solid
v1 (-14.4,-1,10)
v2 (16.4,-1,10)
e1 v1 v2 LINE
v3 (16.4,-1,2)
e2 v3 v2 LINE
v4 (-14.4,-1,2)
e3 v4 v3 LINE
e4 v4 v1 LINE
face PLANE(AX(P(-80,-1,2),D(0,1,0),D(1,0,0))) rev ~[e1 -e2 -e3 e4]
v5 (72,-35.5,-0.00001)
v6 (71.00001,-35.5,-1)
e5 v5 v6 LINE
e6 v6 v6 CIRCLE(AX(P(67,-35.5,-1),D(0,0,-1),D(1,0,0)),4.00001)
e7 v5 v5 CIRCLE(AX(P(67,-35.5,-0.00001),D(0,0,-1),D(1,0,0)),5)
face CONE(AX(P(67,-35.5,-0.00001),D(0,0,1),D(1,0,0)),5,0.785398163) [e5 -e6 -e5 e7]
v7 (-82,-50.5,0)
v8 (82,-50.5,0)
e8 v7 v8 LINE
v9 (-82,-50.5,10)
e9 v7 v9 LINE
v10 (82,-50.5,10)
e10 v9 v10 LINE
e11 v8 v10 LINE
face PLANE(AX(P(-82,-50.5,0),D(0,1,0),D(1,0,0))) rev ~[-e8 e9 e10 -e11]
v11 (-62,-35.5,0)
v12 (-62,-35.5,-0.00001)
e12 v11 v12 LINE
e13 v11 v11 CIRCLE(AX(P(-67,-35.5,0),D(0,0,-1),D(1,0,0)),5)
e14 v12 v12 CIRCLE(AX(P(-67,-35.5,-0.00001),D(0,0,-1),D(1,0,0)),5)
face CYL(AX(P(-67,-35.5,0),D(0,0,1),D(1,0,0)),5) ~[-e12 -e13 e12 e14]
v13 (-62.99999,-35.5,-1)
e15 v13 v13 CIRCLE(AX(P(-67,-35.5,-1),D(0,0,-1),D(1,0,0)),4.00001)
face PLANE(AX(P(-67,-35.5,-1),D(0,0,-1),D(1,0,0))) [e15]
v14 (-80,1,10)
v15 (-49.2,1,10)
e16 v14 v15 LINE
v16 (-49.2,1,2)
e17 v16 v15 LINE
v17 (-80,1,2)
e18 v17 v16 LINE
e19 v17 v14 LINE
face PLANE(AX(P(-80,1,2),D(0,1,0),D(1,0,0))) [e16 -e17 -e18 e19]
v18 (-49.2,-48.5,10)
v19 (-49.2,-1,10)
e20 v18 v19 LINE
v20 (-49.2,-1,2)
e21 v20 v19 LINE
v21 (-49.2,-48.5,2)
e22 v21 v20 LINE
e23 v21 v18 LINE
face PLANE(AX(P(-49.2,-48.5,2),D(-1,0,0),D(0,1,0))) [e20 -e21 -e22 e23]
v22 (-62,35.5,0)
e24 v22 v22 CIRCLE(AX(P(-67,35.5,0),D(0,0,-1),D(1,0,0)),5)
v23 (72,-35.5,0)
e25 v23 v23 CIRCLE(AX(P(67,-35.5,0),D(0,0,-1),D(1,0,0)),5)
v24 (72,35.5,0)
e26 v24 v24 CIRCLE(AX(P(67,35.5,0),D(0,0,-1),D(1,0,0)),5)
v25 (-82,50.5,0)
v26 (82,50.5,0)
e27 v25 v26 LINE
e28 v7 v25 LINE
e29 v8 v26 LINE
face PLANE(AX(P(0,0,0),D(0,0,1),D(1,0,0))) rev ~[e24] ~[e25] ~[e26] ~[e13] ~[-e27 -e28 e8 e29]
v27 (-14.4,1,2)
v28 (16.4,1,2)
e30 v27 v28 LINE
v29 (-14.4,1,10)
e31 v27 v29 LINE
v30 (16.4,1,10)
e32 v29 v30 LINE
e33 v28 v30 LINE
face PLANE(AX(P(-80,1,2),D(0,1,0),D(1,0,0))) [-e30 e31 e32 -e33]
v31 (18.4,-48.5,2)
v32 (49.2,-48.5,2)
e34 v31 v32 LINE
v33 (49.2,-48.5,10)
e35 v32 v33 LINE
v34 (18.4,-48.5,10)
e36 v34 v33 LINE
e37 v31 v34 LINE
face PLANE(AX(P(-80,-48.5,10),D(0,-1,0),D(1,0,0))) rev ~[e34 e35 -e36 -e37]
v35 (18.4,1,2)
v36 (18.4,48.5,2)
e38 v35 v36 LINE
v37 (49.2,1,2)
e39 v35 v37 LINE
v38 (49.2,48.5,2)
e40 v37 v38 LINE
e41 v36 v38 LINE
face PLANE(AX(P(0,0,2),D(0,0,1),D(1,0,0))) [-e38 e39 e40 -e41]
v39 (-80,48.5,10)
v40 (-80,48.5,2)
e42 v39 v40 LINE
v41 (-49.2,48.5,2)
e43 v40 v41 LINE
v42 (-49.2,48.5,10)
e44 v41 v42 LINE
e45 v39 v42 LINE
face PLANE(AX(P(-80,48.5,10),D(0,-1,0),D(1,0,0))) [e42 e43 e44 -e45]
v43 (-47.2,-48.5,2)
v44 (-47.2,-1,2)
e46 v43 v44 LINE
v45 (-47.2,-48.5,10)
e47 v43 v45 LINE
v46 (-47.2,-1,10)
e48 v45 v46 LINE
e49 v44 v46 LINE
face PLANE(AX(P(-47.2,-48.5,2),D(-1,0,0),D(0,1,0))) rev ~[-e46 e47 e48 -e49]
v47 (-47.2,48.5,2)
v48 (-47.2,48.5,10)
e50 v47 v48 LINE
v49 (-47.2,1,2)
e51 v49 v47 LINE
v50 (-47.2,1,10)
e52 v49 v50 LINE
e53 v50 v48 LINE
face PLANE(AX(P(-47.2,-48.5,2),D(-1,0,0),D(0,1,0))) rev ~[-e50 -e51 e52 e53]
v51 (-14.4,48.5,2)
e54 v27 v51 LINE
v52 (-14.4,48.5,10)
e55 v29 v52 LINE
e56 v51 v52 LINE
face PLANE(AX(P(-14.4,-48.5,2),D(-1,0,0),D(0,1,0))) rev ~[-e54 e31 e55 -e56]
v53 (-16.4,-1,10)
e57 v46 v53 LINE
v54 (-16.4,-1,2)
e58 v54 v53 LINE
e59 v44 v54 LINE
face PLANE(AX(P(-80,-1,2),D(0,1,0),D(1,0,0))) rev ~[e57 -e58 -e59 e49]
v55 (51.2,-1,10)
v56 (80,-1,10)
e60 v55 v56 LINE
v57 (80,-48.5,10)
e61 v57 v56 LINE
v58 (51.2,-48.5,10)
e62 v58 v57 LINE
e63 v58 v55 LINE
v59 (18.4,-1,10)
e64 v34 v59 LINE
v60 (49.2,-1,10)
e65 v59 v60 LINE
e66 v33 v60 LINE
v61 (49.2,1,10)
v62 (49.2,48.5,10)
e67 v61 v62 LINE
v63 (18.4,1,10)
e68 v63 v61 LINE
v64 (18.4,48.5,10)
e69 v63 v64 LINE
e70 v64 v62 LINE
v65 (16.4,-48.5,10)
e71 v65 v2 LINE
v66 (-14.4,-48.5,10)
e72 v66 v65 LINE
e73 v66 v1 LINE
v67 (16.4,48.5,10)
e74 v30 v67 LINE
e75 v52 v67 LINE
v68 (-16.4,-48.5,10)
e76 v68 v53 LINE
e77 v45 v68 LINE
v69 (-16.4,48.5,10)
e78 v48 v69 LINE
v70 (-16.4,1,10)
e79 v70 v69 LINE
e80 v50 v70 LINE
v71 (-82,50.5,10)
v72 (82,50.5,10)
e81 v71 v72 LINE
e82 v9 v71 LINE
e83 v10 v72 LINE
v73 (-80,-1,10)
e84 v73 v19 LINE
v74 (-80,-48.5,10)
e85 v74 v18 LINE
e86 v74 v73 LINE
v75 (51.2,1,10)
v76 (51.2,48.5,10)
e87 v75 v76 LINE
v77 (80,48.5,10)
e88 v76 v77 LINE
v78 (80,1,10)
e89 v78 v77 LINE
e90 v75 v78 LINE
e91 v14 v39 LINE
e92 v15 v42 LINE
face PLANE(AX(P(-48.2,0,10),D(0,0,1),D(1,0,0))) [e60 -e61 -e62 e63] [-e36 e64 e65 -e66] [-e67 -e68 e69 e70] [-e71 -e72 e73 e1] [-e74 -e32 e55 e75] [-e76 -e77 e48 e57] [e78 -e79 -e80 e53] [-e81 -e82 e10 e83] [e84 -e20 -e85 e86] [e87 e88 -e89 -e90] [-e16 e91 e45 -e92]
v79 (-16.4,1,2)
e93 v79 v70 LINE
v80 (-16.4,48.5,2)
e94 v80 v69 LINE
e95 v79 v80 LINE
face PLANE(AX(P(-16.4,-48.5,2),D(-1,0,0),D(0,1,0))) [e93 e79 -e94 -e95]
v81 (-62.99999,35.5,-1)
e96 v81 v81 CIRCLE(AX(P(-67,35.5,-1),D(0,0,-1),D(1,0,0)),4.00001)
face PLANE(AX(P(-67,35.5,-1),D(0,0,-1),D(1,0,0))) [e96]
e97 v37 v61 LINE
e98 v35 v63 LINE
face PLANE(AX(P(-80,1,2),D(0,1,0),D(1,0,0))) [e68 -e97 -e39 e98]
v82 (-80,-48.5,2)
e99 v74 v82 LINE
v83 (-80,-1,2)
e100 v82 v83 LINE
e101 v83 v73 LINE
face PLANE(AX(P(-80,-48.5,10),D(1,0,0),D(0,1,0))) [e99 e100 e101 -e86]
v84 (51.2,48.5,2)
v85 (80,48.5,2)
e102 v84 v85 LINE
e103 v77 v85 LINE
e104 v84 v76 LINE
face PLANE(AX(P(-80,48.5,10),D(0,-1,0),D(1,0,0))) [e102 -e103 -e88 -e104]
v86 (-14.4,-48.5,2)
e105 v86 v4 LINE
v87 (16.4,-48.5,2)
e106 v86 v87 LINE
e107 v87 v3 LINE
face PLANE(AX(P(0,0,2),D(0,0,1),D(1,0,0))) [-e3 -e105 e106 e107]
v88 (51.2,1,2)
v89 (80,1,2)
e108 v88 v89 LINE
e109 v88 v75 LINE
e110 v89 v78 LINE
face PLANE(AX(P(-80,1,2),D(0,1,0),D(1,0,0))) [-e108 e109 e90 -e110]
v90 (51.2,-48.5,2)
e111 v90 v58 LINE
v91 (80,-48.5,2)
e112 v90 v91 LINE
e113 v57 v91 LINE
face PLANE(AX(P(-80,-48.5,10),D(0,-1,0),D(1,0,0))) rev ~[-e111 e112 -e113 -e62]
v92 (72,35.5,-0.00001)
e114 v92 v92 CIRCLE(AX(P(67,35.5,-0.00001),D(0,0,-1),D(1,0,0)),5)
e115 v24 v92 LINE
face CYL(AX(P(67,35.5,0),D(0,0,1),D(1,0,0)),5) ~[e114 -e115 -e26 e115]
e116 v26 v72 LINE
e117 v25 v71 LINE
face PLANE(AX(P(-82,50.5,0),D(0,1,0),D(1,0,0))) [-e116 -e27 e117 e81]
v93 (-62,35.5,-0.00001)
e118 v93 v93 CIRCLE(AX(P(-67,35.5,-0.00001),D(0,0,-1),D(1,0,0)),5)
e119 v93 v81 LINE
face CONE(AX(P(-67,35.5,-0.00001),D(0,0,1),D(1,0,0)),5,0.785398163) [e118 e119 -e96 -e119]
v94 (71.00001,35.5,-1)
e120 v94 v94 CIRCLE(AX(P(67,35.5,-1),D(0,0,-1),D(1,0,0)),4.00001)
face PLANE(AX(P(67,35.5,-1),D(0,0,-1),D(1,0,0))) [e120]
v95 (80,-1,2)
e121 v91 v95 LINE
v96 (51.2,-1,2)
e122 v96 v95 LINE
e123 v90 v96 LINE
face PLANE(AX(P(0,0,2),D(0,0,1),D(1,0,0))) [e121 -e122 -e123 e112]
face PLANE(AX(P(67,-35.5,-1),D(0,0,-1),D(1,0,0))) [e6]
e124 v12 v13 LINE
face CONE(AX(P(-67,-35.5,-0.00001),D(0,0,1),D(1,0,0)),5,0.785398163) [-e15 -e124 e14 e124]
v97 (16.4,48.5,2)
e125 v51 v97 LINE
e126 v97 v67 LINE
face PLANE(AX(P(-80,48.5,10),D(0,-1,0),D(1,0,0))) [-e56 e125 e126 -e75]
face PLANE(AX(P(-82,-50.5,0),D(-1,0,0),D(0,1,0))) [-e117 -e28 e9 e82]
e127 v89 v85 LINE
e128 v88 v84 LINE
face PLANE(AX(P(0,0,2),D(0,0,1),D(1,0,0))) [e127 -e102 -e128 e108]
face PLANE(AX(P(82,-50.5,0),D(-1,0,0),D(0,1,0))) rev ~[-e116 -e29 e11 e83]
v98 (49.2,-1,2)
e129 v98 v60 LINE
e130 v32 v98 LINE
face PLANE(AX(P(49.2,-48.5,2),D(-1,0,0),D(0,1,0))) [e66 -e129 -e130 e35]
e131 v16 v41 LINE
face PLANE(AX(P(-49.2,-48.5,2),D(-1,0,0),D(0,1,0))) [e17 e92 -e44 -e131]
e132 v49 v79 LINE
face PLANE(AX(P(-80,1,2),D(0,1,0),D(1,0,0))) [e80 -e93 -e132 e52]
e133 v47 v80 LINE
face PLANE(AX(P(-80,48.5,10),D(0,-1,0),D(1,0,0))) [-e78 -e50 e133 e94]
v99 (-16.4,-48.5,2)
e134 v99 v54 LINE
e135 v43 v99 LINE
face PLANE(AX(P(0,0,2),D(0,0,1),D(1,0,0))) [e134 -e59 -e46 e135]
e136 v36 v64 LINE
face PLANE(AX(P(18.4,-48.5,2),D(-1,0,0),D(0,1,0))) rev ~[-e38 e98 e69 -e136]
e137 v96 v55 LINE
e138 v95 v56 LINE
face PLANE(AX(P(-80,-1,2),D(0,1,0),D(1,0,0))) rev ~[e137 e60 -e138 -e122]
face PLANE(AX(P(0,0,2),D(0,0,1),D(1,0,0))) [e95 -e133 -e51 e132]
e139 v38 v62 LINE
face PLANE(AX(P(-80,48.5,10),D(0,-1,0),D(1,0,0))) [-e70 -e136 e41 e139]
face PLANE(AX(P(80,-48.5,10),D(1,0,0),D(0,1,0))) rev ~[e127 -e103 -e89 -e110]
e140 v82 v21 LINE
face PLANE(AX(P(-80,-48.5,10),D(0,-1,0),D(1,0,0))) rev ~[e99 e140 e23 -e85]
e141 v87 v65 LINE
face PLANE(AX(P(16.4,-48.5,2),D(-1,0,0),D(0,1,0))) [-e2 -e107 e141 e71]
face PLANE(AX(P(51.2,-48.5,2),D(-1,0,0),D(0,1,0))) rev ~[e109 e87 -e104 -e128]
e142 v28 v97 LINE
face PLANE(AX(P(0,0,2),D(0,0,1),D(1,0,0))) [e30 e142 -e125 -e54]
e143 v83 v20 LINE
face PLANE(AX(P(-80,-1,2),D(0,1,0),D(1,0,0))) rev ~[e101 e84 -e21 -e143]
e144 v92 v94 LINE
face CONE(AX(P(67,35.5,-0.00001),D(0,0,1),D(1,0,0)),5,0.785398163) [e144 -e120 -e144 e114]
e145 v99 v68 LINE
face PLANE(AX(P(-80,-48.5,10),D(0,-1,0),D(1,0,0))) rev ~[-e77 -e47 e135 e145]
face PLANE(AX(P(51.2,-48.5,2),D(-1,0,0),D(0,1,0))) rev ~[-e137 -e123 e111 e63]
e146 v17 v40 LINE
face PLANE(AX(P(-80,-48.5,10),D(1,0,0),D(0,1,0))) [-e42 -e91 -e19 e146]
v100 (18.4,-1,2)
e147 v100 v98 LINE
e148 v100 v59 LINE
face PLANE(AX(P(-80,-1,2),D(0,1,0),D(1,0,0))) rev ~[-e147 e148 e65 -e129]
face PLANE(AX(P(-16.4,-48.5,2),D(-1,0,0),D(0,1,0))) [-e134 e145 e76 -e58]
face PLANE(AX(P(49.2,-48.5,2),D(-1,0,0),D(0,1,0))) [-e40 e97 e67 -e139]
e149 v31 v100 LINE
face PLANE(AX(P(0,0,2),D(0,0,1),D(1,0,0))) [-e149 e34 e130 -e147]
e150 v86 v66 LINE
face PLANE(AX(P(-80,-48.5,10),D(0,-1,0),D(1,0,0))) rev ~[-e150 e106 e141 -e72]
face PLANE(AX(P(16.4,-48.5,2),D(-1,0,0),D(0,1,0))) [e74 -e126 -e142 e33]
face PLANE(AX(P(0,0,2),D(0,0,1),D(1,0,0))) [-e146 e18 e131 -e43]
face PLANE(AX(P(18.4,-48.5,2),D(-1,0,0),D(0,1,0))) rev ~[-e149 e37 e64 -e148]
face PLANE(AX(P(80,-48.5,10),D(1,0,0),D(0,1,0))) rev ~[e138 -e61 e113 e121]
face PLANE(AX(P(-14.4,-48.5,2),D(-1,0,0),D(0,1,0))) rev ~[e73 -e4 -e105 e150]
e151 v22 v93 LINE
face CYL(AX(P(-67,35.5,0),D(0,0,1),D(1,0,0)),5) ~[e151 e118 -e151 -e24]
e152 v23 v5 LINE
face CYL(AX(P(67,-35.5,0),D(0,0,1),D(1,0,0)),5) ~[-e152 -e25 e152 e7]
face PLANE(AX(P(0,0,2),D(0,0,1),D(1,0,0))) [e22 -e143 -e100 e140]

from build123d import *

# Parameters (mm, degrees)
F0_W     = 164
F0_H     = 101
F1_DEPTH = 10
F2_W     = 160
F2_H     = 97
F3_DEPTH = 8
F4_W     = 160
F4_H     = 2
F5_DEPTH = 8
F6_W     = 2
F6_H     = 97
F7_DEPTH = 8
F8_R     = 5
F9_DEPTH = 1
F10_SIZE = 0.99999


# Not quite as in the source:
# - a fillet or chamfer is up to 0.001 mm smaller than in the source, because OpenCascade refuses the exact size


with BuildPart() as f1:
    # F0 (on Top) → F1 (new body)
    with BuildSketch(Plane.XY):
        Rectangle(F0_W, F0_H)
    extrude(amount=F1_DEPTH)

    # F2 (on face) → F3 (cut)
    with BuildSketch(Plane.XY.offset(10)):
        Rectangle(F2_W, F2_H)
    extrude(amount=-F3_DEPTH, mode=Mode.SUBTRACT)

    # F4 (on face) → F5 (join)
    with BuildSketch(Plane.XY.offset(2)):
        Rectangle(F4_W, F4_H)
    extrude(amount=F5_DEPTH)

    # F6 (on face) → F7 (join)
    with BuildSketch(Plane.XY.offset(2)):
        with Locations((-48.2, 0)):
            Rectangle(F6_W, F6_H)
        with Locations((-15.4, 0)):
            Rectangle(F6_W, F6_H)
        with Locations((17.4, 0)):
            Rectangle(F6_W, F6_H)
        with Locations((50.2, 0)):
            Rectangle(F6_W, F6_H)
    extrude(amount=F7_DEPTH)

    # F8 (on face) → F9 (join)
    with BuildSketch(Plane(origin=(0, 0, 0), x_dir=(1, 0, 0), z_dir=(0, 0, -1))):
        with Locations((-67, 35.5)):
            Circle(F8_R)
        with Locations((67, 35.5)):
            Circle(F8_R)
        with Locations((67, -35.5)):
            Circle(F8_R)
        with Locations((-67, -35.5)):
            Circle(F8_R)
    extrude(amount=F9_DEPTH)

    # F10 (size 1 in the source; OpenCascade refuses exactly that, so slightly less here)
    f10_edges = [f1.edges().sort_by_distance(p)[0] for p in [
        (-72, -35.5, -1),
        (-72, 35.5, -1),
        (62, -35.5, -1),
        (62, 35.5, -1),
    ]]
    chamfer(f10_edges, length=F10_SIZE)


solid = f1.part
